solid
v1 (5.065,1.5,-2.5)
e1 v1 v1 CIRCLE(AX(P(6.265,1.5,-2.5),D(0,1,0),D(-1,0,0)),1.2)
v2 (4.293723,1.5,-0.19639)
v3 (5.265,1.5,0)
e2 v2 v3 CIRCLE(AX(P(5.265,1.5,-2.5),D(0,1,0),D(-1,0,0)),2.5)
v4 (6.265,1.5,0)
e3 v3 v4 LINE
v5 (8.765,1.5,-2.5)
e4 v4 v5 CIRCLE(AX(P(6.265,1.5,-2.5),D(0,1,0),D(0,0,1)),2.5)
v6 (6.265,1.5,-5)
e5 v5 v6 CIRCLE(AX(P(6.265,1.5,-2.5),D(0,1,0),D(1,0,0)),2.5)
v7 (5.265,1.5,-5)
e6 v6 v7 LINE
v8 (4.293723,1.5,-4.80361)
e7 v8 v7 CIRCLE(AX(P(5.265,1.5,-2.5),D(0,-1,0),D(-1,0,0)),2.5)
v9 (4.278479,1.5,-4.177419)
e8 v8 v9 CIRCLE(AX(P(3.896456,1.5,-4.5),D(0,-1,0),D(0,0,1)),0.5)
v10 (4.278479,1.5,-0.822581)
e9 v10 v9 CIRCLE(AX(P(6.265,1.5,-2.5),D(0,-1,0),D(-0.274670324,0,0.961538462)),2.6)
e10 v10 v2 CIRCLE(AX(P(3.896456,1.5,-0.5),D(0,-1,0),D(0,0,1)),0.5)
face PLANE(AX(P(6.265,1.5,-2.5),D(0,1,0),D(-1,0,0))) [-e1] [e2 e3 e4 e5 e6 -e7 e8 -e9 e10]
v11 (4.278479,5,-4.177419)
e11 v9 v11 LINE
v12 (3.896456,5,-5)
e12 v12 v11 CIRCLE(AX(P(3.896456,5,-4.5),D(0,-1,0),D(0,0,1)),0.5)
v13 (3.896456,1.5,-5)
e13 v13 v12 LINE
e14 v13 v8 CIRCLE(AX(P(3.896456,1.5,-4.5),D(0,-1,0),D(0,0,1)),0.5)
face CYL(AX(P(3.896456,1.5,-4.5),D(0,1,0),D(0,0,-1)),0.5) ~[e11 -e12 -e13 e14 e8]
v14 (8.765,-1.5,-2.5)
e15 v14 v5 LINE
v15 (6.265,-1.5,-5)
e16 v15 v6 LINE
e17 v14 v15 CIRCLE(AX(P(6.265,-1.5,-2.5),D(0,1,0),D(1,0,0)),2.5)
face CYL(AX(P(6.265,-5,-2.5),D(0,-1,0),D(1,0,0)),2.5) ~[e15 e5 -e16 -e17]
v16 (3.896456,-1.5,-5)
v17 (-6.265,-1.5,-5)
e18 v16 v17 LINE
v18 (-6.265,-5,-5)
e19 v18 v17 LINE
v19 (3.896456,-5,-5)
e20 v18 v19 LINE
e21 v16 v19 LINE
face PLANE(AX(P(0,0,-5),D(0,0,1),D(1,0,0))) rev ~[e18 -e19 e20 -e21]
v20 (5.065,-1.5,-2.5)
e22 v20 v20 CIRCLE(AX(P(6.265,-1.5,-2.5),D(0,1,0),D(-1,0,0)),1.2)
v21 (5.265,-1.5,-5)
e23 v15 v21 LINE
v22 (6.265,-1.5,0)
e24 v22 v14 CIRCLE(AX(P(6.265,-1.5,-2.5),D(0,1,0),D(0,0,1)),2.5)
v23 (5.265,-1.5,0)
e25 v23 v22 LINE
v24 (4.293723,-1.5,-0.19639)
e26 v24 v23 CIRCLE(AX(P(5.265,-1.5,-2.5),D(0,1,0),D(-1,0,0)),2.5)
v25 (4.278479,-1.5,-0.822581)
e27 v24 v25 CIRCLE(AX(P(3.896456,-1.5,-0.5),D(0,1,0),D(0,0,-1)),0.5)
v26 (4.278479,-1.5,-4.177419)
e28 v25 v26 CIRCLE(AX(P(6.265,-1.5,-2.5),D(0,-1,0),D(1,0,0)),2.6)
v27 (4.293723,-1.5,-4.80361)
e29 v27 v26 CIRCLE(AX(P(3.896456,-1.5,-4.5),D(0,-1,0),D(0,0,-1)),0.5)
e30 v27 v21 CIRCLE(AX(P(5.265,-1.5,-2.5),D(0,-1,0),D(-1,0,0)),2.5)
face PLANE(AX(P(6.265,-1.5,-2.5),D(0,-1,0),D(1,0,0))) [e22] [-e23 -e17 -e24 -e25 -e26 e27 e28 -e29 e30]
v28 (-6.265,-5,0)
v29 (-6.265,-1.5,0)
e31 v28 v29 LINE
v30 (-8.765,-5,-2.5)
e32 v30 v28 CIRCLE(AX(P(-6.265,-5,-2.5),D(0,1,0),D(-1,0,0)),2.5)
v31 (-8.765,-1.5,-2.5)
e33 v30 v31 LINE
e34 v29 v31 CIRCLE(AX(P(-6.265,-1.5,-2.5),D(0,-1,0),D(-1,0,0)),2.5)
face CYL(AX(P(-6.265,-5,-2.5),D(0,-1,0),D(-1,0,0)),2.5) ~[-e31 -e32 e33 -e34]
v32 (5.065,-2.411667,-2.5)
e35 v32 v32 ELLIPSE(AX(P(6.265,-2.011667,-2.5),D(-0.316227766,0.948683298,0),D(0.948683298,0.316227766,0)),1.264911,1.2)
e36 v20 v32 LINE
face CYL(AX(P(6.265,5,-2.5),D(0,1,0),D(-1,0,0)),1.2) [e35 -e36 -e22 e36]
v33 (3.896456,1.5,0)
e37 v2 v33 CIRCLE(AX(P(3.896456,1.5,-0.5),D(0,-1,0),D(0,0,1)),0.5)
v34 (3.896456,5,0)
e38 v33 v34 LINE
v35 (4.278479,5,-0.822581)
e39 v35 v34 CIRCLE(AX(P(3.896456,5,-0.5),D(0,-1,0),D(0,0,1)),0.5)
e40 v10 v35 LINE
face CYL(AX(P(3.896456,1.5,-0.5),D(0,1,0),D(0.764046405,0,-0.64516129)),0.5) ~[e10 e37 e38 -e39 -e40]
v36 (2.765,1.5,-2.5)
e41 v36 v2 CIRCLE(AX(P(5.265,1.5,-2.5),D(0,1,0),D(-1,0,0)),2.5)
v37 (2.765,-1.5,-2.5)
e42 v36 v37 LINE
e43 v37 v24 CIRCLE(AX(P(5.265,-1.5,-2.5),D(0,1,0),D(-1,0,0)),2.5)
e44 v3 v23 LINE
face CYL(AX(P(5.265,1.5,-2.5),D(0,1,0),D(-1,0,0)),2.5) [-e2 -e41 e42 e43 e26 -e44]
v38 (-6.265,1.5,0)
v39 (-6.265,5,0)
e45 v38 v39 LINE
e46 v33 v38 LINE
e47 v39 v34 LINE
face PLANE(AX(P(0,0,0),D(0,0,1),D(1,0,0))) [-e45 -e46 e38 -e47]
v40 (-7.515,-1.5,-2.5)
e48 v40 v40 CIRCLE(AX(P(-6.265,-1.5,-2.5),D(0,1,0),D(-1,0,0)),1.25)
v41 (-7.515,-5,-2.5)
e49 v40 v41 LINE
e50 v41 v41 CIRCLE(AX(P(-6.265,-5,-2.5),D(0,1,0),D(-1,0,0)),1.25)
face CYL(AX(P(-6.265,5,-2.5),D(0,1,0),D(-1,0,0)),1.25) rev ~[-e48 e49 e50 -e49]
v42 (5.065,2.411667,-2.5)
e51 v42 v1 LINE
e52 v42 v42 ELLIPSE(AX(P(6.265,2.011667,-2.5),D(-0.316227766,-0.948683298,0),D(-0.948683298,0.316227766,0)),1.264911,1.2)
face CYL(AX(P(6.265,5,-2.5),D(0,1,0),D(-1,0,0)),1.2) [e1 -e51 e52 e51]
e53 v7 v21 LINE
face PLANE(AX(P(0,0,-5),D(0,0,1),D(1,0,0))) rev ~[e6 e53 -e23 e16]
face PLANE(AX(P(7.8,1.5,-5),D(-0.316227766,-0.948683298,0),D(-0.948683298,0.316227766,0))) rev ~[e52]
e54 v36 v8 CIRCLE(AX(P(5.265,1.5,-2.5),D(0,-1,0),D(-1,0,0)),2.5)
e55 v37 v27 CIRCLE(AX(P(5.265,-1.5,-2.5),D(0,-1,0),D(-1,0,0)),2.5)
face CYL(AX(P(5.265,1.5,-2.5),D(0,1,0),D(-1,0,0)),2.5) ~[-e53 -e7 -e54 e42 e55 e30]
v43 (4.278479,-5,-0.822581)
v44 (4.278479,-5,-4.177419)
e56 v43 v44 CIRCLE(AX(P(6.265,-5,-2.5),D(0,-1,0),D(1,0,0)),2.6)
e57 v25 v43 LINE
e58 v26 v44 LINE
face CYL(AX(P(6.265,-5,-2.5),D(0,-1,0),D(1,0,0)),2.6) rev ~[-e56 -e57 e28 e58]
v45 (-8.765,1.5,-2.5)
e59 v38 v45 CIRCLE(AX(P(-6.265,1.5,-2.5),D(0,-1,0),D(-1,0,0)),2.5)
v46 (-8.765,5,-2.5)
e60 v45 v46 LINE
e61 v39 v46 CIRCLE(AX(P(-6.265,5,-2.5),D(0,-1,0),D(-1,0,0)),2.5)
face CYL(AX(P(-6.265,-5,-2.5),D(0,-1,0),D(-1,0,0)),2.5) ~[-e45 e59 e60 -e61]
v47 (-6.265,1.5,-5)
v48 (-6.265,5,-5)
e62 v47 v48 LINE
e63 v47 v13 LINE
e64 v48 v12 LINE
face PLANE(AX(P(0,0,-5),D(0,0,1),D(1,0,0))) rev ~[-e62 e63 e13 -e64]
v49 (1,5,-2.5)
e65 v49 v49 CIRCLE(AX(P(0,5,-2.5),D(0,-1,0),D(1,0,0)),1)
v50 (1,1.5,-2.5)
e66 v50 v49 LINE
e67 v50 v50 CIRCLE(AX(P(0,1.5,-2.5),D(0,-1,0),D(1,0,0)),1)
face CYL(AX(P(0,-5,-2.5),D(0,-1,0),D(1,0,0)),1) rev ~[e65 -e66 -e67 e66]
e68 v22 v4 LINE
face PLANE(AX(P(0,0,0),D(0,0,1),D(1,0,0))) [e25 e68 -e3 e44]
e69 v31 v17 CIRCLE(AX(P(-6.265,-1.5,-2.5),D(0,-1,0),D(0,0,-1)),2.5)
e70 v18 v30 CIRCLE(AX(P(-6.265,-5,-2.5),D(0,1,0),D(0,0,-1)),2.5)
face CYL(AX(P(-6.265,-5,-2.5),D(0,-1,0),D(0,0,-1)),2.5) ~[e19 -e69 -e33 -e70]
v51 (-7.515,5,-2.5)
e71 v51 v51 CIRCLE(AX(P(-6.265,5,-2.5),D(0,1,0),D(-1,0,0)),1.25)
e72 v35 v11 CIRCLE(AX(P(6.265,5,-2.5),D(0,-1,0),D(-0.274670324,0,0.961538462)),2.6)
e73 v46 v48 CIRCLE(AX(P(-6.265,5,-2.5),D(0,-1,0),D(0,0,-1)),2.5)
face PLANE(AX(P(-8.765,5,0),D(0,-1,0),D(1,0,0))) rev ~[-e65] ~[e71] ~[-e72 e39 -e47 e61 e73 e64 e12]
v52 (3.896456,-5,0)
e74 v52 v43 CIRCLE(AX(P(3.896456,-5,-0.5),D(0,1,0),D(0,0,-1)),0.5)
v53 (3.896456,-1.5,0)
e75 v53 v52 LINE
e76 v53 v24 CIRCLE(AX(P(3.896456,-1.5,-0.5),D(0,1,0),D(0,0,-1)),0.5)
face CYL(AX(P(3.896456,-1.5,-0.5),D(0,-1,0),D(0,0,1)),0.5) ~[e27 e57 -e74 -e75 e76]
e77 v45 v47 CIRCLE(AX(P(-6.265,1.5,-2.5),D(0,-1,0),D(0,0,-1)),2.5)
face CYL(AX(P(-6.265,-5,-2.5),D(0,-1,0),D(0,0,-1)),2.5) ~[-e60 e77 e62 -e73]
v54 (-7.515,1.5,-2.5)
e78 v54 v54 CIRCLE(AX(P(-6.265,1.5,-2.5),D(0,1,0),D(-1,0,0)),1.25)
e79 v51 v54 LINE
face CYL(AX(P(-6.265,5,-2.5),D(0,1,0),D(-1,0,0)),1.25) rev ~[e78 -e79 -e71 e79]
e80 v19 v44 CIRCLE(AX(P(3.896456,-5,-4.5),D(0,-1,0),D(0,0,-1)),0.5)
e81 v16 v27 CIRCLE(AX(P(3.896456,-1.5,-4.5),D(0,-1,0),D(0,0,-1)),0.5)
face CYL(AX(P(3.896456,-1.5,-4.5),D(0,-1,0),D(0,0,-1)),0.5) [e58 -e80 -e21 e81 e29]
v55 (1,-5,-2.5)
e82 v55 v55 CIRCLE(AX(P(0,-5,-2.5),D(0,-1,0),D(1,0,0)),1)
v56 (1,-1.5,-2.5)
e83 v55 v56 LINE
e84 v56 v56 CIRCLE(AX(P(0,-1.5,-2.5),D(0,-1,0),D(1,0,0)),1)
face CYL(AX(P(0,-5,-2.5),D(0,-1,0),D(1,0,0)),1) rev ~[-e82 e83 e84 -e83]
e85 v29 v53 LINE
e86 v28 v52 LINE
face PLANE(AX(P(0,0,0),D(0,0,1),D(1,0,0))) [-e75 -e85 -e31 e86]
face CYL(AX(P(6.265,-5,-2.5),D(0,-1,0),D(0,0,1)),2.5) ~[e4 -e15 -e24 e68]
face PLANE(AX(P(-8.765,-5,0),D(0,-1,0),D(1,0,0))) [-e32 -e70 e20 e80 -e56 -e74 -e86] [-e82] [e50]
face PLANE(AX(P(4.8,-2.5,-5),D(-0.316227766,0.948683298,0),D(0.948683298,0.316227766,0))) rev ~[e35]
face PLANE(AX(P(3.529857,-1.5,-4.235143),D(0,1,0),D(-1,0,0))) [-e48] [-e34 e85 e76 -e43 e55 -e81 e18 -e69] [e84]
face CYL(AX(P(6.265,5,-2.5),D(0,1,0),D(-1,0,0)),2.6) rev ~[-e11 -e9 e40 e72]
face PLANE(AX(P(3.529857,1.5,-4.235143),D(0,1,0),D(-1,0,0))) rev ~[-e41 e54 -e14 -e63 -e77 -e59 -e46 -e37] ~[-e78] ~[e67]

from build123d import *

# Parameters (mm, degrees)
F0_W         = 17.53
F0_H         = 10
F1_DEPTH     = 5
F3_DEPTH     = 10.001
F4_R         = 1.25
F5_DEPTH     = 10.001
F6_R         = 2.6
F7_DEPTH     = 3.5
F8_R         = 2.6
F9_DEPTH     = 3.5
F10_W        = 14.03
F10_H        = 3
F11_DEPTH    = 5.001
F12_R        = 1.2
F13_DEPTH    = 10
F14_R        = 0.5
F16_DEPTH    = 5.001
F17_T1_DEPTH = 3
F18_R        = 1
F19_DEPTH    = 10.001


# Not quite as in the source:
# - a fillet or chamfer that OpenCascade refuses, or shapes differently, is made with other operations: its cross-section is extruded or revolved along the edge and cut away or added


with BuildPart() as f1:
    # F0 (on Top) → F1 (new body)
    with BuildSketch(Plane.XY):
        Rectangle(F0_W, F0_H)
    extrude(amount=-F1_DEPTH)

    # F2 (on face) → F3 (cut, through all)
    with BuildSketch(Plane.XZ.offset(5)):
        with BuildLine():
            Line((8.765, 0), (6.265, 0))
            ThreePointArc((6.265, 0), (8.032766953, -0.732233047), (8.765, -2.5))
            Line((8.765, -2.5), (8.765, 0))
        make_face()
        with BuildLine():
            Line((8.765, -5), (8.765, -2.5))
            ThreePointArc((8.765, -2.5), (8.032766953, -4.267766953), (6.265, -5))
            Line((6.265, -5), (8.765, -5))
        make_face()
        with BuildLine():
            ThreePointArc((-6.265, -5), (-8.032766953, -4.267766953), (-8.765, -2.5))
            Line((-8.765, -2.5), (-8.765, -5))
            Line((-8.765, -5), (-6.265, -5))
        make_face()
        with BuildLine():
            ThreePointArc((-8.765, -2.5), (-8.032766953, -0.732233047), (-6.265, 0))
            Line((-6.265, 0), (-8.765, 0))
            Line((-8.765, 0), (-8.765, -2.5))
        make_face()
    extrude(amount=-F3_DEPTH, mode=Mode.SUBTRACT)

    # F4 (on face) → F5 (cut, through all)
    with BuildSketch(Plane(origin=(0, 5, 0), x_dir=(-1, 0, 0), z_dir=(0, 1, 0))):
        with Locations((6.265, -2.5)):
            Circle(F4_R)
    extrude(amount=-F5_DEPTH, mode=Mode.SUBTRACT)

    # F6 (on face) → F7 (cut)
    with BuildSketch(Plane(origin=(0, 5, 0), x_dir=(-1, 0, 0), z_dir=(0, 1, 0))):
        with Locations((-6.265, -2.5)):
            Circle(F6_R)
    extrude(amount=-F7_DEPTH, mode=Mode.SUBTRACT)

    # F8 (on face) → F9 (cut)
    with BuildSketch(Plane.XZ.offset(5)):
        with Locations((6.265, -2.5)):
            Circle(F8_R)
    extrude(amount=-F9_DEPTH, mode=Mode.SUBTRACT)

    # F10 (on face) → F11 (cut, through all)
    with BuildSketch(Plane.XY):
        with Locations((-4.25, 0)):
            Rectangle(F10_W, F10_H)
    extrude(amount=-F11_DEPTH, mode=Mode.SUBTRACT)

    # F12 (on face) → F13 (join)
    with BuildSketch(Plane(origin=(0, 5, 0), x_dir=(-1, 0, 0), z_dir=(0, 1, 0))):
        with Locations((-6.265, -2.5)):
            Circle(F12_R)
    extrude(amount=-F13_DEPTH)

    # F14
    f14_edges = [f1.edges().sort_by_distance(p)[0] for p in [
        (5.550857, 3.25, 0),
        (5.550857, -3.25, 0),
        (5.550857, -3.25, -5),
        (5.550857, 3.25, -5),
    ]]
    fillet(f14_edges, radius=F14_R)

    # F15 (on face) → F16 (cut, through all)
    with BuildSketch(Plane(origin=(0, 0, -5), x_dir=(1, 0, 0), z_dir=(0, 0, -1))):
        Polygon((8, 2.4762265265), (8, 5.5), (4.8, 5.5), (4.8, 2.5), (7.8, 1.5), align=None)
        Polygon((4.8, -5.5), (8, -5.5), (8, -2.4762265265), (7.8, -1.5), (4.8, -2.5), align=None)
    extrude(amount=-F16_DEPTH, mode=Mode.SUBTRACT)

    # F17: fillet of radius 2.5 on 2 edges, made by hand

    # F17_s2 → F17_t1 (cut)
    with BuildSketch(Plane.XZ.offset(-1.5)):
        with BuildLine():
            ThreePointArc((2.765, -2.5), (3.497233047, -0.732233047), (5.265, 0))
            Line((5.265, 0), (2.765, 0))
            Line((2.765, 0), (2.765, -2.5))
        make_face()
        with BuildLine():
            ThreePointArc((2.765, -2.5), (3.497233047, -4.267766953), (5.265, -5))
            Line((5.265, -5), (2.765, -5))
            Line((2.765, -5), (2.765, -2.5))
        make_face()
    extrude(amount=F17_T1_DEPTH, mode=Mode.SUBTRACT)

    # F18 (on face) → F19 (cut, through all)
    with BuildSketch(Plane.XZ.offset(5)):
        with Locations((0, -2.5)):
            Circle(F18_R)
    extrude(amount=-F19_DEPTH, mode=Mode.SUBTRACT)


solid = f1.part
